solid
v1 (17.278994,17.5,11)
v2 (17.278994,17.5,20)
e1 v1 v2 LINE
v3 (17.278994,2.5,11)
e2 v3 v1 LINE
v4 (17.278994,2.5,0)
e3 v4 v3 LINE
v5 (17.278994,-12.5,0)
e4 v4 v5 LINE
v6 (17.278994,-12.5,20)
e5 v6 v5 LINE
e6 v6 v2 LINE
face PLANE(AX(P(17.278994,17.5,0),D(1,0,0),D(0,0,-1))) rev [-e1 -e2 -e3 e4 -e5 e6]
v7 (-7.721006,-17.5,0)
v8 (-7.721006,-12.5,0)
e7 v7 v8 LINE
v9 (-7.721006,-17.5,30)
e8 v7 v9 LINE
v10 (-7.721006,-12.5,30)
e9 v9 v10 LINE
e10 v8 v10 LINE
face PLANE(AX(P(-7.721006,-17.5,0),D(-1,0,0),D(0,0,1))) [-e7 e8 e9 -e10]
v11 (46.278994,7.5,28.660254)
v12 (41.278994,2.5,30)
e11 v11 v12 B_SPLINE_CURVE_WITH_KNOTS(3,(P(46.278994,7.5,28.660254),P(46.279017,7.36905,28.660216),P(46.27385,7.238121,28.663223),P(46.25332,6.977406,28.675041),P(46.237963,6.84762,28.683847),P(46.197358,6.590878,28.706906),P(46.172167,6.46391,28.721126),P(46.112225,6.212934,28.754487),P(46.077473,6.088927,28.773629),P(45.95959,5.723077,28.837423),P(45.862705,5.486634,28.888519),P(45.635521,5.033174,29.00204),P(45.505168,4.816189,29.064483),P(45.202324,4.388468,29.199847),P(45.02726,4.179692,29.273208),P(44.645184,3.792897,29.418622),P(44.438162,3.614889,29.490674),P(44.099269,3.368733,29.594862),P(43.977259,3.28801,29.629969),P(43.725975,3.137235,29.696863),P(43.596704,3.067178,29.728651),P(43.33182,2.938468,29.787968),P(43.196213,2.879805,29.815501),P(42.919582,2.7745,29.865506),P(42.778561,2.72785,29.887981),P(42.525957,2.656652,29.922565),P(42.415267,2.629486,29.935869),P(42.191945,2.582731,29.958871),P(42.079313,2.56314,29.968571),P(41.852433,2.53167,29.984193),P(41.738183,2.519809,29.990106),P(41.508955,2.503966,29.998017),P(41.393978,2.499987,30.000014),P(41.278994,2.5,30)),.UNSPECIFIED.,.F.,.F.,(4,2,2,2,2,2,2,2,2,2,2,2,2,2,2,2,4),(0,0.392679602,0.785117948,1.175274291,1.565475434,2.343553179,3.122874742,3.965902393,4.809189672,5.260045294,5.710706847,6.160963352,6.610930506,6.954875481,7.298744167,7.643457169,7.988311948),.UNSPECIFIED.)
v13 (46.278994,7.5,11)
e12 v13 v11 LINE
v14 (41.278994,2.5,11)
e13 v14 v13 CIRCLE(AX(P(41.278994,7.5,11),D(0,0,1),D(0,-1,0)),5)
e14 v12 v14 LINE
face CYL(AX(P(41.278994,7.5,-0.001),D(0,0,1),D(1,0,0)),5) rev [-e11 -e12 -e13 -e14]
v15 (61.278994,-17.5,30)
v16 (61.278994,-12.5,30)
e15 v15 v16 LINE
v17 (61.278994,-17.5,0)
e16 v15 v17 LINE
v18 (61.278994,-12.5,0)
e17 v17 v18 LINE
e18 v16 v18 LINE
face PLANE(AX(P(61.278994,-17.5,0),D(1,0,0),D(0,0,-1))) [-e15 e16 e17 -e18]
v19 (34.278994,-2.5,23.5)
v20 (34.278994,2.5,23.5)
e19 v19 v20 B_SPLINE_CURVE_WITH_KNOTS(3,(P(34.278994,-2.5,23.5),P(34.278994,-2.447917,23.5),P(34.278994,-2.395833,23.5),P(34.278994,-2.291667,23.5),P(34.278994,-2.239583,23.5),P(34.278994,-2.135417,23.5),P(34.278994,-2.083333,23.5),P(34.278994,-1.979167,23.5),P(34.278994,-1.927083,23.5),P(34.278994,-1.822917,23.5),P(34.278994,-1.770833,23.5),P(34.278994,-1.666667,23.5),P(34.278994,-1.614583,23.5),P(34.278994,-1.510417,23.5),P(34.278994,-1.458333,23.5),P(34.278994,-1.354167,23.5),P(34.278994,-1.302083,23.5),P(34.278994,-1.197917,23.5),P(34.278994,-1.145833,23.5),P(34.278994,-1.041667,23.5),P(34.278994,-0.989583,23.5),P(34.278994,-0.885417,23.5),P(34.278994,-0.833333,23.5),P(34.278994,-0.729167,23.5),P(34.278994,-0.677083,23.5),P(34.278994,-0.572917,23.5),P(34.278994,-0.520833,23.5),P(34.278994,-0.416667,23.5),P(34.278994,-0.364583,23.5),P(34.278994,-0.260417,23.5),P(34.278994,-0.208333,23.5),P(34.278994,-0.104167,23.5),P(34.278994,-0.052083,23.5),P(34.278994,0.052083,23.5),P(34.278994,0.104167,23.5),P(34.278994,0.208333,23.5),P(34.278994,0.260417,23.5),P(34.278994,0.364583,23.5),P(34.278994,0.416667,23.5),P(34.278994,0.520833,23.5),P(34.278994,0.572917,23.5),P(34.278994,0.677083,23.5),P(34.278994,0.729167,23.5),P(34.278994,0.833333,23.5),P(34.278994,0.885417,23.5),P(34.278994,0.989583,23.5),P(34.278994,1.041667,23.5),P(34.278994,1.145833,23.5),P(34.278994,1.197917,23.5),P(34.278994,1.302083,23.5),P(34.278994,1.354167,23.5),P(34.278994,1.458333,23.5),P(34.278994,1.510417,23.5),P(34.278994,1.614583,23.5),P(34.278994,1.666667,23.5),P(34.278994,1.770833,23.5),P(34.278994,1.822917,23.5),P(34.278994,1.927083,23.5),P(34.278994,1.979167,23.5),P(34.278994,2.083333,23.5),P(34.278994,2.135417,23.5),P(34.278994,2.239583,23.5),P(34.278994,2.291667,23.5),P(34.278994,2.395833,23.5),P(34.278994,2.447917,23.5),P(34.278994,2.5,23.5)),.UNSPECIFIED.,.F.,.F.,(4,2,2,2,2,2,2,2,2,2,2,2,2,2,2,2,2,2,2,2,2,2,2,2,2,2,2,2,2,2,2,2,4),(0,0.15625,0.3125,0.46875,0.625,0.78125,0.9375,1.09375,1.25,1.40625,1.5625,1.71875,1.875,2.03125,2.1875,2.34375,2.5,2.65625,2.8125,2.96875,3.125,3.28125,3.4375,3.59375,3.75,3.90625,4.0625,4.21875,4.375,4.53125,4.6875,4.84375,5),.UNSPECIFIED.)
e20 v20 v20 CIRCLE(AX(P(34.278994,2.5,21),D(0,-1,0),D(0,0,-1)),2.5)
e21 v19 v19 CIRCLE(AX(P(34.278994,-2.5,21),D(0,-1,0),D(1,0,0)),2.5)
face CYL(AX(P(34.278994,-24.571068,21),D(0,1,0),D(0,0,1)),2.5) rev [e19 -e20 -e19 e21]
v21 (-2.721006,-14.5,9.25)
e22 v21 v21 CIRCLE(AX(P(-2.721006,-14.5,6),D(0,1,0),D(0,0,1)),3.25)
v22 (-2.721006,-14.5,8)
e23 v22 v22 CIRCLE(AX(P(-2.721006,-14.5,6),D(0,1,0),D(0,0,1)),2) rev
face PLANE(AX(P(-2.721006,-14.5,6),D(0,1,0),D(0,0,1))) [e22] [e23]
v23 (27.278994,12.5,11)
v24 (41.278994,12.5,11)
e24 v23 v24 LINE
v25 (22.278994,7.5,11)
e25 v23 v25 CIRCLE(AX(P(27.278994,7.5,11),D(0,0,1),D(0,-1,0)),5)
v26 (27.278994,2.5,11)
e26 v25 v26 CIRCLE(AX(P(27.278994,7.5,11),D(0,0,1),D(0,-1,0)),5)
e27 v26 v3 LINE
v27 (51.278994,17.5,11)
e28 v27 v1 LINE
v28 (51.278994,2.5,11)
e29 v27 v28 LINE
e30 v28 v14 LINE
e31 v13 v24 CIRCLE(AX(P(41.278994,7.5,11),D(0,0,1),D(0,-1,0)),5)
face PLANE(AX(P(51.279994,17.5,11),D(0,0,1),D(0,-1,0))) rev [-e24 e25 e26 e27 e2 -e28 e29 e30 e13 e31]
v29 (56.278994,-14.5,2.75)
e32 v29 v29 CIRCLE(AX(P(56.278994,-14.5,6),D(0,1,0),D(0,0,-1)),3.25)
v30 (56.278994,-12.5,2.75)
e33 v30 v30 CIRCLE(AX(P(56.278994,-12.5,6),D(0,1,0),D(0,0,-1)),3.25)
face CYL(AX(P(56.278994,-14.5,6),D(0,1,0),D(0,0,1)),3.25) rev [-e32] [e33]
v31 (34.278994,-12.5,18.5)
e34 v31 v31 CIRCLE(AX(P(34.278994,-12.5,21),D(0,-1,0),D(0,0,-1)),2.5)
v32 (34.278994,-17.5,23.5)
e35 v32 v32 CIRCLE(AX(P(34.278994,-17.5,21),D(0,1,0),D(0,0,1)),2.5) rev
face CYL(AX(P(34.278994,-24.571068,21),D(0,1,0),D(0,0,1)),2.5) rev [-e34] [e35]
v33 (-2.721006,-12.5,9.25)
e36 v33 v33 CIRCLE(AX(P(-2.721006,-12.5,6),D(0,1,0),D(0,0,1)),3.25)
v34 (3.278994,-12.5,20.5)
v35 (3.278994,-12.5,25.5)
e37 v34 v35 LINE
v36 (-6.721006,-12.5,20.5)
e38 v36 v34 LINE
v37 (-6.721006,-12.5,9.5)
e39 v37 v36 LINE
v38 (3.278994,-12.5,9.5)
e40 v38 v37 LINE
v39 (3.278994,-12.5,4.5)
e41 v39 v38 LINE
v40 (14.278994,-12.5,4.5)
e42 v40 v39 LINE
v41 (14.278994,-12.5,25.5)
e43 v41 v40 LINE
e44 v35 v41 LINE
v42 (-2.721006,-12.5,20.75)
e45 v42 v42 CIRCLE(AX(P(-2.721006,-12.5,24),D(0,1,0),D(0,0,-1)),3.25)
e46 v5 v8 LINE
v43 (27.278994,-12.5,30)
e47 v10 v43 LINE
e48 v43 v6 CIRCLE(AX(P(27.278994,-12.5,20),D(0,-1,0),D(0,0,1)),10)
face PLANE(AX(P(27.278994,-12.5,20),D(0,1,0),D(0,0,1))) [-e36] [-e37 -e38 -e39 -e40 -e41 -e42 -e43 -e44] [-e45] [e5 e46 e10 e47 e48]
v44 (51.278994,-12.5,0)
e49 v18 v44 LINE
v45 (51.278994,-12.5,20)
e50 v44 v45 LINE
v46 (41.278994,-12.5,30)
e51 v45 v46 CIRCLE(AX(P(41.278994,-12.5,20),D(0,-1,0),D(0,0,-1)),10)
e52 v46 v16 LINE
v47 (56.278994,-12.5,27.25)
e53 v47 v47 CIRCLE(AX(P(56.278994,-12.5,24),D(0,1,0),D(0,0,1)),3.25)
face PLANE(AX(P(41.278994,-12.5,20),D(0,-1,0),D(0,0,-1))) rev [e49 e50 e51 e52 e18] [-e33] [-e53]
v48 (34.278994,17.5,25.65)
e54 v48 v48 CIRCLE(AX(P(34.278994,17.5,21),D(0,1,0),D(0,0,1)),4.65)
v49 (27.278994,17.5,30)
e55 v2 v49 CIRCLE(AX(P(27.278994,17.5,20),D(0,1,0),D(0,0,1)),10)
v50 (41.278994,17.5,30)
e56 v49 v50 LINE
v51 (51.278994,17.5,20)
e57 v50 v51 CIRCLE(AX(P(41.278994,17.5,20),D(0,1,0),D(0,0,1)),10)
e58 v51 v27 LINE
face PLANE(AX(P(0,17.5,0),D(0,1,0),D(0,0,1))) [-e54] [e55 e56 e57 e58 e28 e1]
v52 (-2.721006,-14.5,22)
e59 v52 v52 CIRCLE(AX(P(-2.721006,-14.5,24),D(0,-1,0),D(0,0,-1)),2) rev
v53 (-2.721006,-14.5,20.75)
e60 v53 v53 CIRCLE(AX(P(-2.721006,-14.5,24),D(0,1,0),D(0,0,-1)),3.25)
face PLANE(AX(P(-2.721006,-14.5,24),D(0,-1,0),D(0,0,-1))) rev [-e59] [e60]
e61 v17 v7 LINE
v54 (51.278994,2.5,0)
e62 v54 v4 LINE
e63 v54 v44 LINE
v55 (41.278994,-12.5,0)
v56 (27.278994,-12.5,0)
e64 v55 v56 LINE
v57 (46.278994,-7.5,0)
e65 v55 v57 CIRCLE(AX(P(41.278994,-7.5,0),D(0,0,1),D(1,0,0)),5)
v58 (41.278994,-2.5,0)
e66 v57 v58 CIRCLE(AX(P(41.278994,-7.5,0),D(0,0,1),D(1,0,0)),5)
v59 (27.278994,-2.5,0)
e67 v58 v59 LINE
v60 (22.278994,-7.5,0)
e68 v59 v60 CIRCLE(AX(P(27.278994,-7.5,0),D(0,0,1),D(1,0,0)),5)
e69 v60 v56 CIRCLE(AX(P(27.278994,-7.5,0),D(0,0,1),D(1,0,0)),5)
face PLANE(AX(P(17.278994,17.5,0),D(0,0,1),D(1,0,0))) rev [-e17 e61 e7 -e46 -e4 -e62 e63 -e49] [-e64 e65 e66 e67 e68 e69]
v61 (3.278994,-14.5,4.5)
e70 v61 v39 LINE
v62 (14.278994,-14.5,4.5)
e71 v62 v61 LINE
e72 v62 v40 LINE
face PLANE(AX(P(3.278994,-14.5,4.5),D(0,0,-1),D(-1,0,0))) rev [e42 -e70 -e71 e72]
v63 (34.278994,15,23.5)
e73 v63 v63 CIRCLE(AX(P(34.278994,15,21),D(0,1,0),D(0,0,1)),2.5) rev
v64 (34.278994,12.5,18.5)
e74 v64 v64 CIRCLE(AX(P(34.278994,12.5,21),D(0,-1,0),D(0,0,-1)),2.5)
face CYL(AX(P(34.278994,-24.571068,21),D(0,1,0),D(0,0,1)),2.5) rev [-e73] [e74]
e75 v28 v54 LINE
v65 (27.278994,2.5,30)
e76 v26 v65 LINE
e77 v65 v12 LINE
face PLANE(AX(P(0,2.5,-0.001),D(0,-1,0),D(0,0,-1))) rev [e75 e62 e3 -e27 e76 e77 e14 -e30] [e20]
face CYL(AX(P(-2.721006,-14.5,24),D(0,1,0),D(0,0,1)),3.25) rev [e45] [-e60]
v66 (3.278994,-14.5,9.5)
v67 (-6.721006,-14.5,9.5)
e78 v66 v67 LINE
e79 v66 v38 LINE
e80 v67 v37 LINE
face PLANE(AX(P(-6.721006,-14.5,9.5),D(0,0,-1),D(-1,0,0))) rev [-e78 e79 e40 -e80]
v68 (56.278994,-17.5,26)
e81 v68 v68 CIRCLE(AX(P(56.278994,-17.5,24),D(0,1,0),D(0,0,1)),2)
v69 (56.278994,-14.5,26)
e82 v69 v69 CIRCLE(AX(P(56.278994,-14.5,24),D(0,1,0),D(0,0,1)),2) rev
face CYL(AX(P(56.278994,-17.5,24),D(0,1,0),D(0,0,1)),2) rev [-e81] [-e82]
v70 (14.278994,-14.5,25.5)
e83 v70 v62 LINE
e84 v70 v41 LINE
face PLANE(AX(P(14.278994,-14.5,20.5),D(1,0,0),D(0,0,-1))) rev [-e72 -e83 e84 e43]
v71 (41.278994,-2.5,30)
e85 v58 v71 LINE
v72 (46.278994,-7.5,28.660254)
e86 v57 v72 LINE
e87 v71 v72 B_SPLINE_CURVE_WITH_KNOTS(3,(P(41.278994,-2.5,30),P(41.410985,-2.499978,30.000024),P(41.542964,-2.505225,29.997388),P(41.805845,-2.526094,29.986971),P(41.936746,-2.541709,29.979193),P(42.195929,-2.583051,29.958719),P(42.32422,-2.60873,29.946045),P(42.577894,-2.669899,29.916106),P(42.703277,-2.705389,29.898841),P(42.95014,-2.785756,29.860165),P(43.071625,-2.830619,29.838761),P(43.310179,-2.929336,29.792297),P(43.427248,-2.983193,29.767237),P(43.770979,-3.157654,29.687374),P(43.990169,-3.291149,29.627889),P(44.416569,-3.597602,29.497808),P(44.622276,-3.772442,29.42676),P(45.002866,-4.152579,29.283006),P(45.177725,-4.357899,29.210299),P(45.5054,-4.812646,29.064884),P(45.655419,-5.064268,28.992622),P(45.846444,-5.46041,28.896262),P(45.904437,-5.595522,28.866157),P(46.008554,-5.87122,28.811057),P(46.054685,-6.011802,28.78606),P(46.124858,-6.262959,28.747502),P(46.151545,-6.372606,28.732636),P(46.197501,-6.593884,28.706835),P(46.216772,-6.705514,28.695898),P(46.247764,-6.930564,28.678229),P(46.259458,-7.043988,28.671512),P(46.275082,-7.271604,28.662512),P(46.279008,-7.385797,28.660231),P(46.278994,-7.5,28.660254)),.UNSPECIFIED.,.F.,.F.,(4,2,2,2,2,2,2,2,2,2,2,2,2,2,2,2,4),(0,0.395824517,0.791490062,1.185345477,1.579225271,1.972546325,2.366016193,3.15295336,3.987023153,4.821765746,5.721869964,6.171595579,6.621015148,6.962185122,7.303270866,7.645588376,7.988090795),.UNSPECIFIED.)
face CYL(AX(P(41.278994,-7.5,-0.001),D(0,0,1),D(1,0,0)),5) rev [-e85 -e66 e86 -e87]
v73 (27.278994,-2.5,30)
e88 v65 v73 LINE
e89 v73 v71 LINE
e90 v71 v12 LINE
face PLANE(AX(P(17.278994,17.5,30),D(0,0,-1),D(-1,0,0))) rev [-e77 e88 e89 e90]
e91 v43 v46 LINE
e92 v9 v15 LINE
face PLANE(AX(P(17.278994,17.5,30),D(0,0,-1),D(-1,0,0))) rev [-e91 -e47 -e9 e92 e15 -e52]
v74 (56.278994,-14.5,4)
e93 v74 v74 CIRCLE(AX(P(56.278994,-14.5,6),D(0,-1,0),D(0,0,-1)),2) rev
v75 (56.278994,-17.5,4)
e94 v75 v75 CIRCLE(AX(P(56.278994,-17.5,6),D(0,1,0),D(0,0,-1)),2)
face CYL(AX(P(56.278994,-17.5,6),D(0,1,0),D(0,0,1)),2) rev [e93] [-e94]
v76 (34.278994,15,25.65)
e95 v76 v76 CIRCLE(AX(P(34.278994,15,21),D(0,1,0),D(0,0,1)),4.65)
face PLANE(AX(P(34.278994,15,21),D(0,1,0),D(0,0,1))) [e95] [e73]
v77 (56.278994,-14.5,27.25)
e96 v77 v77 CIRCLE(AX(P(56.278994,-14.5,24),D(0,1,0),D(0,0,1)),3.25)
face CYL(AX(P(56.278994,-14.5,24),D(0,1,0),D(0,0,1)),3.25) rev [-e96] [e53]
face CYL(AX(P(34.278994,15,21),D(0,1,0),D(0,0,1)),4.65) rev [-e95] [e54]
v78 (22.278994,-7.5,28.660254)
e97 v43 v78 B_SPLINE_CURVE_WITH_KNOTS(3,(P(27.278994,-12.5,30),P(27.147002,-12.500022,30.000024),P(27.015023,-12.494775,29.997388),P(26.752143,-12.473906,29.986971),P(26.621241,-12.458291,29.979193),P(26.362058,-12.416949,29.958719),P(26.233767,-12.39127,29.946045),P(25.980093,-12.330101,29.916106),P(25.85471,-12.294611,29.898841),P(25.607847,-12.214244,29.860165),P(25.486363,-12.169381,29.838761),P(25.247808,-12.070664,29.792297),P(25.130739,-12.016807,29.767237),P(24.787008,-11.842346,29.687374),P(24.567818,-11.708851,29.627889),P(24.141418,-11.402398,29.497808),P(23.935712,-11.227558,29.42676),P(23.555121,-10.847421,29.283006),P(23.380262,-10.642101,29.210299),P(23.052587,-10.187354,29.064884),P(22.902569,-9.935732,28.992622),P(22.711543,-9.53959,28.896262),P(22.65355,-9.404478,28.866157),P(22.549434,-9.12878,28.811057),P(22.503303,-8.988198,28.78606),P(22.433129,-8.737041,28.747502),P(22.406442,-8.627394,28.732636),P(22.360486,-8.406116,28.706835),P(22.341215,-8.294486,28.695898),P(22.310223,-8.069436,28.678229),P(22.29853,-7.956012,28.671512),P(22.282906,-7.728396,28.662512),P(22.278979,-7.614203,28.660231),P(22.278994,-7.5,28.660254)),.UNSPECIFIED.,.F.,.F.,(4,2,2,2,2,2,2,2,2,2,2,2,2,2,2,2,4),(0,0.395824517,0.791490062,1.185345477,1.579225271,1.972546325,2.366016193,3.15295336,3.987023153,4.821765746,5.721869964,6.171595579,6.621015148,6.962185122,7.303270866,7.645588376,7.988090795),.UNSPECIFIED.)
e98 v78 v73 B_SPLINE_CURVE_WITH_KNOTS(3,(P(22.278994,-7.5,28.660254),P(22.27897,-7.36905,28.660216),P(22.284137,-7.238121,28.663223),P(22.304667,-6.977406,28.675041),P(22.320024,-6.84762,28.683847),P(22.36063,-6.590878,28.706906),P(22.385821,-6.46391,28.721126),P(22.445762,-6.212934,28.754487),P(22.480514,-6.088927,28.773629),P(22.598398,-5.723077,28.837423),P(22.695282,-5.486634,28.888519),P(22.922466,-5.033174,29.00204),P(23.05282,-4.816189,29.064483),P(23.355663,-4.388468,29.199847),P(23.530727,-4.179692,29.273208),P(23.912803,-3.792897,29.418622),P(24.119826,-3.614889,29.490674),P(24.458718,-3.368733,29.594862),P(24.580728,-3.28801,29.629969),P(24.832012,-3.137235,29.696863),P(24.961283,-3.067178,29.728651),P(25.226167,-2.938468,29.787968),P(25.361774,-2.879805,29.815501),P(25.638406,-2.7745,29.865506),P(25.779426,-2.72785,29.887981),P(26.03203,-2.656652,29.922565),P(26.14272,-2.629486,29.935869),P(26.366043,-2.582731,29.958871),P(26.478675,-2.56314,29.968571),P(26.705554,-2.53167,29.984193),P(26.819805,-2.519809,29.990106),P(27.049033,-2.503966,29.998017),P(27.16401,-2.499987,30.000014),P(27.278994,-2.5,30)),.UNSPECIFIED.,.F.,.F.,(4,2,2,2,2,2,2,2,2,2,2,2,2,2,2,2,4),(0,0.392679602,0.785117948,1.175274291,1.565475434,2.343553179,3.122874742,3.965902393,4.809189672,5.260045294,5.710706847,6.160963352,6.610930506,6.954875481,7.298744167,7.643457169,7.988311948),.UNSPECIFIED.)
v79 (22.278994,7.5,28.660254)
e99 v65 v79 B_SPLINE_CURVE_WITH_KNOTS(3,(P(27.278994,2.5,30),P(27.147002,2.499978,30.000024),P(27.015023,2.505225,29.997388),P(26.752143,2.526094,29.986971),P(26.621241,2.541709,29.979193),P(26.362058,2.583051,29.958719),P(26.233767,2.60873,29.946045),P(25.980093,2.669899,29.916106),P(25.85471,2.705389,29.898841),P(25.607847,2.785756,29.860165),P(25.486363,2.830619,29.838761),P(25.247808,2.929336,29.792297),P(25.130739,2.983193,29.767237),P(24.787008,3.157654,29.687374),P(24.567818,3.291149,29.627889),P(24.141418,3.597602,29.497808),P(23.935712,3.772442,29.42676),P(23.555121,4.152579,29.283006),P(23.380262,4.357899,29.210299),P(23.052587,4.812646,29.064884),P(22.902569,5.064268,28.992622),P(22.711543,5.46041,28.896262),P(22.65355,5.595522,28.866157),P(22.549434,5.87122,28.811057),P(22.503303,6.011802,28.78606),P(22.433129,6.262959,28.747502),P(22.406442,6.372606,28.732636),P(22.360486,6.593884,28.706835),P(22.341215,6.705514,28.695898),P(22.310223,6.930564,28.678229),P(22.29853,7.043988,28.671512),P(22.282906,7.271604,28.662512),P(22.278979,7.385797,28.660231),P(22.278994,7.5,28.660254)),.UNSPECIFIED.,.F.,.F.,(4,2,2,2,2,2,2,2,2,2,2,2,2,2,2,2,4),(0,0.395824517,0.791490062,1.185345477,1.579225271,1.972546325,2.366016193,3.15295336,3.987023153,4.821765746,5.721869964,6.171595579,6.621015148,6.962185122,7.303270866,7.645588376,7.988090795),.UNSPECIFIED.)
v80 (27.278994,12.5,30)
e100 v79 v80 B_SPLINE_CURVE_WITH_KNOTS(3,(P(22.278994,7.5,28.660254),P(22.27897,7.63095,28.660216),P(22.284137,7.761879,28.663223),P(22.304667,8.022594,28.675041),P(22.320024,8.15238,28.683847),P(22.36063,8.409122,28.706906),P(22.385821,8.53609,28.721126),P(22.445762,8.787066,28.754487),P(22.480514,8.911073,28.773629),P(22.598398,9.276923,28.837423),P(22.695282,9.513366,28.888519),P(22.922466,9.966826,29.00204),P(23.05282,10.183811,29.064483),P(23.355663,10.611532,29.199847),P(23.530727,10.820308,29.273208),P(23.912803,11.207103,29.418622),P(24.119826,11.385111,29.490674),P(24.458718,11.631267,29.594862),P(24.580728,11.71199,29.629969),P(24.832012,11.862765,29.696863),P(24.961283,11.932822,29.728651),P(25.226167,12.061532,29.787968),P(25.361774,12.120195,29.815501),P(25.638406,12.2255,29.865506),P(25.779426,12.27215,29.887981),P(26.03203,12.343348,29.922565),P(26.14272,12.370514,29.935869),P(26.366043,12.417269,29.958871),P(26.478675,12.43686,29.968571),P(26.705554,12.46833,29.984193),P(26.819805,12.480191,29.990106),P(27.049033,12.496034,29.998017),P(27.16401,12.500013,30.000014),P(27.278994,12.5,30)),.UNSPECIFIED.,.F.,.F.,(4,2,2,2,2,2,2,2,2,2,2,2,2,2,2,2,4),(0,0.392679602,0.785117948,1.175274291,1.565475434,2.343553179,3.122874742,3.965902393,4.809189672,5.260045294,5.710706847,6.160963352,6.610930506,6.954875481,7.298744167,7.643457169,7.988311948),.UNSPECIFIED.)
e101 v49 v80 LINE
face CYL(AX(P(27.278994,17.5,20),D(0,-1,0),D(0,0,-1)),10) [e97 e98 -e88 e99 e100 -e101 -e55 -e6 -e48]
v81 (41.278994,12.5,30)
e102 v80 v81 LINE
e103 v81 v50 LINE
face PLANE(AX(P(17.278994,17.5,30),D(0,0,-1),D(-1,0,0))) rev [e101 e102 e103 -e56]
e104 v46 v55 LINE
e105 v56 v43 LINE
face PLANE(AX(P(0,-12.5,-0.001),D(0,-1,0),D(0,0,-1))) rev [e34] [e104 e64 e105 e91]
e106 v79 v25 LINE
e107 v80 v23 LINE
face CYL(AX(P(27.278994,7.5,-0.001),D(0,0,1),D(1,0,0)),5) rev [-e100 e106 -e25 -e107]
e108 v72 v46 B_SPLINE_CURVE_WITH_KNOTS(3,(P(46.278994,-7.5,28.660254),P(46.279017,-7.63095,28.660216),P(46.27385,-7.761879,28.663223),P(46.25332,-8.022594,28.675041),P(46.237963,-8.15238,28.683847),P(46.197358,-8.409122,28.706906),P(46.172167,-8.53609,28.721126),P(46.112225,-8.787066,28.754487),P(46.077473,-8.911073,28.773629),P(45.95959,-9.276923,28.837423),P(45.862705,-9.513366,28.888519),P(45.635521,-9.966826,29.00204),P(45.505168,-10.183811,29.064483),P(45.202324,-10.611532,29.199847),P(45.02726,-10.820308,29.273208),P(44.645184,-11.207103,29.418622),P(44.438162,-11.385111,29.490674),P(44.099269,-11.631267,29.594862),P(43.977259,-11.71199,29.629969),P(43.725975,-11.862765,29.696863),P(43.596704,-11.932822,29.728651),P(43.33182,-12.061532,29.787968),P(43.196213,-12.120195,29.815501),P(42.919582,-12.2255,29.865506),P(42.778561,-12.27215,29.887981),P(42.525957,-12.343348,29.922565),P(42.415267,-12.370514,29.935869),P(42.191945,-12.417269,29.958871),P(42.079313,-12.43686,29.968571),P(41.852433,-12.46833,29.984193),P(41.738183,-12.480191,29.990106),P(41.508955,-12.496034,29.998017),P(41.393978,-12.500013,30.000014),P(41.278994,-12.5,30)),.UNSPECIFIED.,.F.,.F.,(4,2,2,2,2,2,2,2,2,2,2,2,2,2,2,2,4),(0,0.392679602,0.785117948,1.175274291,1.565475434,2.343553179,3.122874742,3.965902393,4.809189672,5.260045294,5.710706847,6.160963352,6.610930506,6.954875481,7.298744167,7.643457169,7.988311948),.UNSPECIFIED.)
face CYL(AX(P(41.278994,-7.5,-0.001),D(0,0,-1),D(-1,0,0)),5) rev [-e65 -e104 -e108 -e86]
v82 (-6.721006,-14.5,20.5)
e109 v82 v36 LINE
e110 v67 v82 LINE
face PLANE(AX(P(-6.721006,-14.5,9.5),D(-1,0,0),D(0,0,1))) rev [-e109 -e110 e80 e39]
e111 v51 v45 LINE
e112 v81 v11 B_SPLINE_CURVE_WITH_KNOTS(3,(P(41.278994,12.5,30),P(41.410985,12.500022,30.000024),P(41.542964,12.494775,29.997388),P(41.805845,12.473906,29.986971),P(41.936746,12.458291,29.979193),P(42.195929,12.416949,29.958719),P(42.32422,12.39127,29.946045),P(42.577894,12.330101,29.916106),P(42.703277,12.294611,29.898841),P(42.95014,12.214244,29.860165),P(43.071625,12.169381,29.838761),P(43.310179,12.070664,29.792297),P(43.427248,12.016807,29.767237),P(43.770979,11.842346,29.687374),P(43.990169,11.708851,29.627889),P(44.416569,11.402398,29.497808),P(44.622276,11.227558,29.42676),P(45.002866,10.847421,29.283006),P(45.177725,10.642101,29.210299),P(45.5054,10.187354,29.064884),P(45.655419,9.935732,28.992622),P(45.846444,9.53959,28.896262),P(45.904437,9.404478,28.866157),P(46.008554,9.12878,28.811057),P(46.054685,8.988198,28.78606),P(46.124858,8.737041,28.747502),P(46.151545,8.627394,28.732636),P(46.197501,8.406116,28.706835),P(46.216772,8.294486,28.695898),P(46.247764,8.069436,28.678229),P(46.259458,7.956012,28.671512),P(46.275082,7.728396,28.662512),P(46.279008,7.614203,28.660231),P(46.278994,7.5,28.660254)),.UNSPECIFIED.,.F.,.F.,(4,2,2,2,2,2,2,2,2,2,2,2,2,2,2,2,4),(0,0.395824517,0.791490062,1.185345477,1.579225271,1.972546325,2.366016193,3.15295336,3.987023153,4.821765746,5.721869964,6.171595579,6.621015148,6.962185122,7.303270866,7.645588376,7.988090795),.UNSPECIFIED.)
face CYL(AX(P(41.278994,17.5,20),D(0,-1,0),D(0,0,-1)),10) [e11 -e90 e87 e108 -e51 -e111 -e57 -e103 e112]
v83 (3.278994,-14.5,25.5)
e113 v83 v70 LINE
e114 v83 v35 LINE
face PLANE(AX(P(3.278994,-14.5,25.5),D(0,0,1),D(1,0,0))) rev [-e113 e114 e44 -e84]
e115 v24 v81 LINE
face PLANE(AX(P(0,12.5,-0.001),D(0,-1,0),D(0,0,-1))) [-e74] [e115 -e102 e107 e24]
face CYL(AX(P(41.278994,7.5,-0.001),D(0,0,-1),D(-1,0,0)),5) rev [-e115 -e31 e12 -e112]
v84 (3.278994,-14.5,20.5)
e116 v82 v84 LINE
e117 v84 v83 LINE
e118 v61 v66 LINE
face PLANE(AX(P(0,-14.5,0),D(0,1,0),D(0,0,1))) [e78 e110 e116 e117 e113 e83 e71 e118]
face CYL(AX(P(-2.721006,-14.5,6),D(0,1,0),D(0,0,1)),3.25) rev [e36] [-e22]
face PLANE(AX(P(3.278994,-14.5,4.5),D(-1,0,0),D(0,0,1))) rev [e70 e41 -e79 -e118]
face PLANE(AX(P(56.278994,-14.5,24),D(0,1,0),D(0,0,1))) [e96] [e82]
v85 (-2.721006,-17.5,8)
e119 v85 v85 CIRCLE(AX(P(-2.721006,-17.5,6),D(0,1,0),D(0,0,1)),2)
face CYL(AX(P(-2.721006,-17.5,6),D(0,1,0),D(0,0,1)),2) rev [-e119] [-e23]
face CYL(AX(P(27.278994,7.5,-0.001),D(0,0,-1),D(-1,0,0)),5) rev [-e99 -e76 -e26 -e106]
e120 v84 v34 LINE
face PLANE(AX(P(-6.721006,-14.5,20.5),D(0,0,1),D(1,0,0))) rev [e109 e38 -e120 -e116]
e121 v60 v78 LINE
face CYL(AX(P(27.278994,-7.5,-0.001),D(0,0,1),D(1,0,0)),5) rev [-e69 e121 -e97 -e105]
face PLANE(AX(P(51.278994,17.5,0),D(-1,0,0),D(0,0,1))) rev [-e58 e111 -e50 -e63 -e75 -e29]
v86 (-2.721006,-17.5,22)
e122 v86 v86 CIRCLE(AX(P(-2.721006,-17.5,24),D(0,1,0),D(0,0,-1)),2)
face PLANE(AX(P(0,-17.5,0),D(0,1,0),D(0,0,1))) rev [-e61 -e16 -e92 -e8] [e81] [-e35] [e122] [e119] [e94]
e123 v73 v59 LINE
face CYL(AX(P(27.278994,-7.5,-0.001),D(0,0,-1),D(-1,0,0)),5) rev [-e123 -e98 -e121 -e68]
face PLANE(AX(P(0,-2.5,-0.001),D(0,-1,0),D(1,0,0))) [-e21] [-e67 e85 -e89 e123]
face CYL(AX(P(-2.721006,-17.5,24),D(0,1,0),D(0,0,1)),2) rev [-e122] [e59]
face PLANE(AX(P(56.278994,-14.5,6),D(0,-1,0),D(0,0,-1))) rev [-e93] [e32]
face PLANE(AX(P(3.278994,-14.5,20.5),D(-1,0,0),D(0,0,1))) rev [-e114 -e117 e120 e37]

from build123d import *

# Parameters (mm, degrees)
CROQUIS21_W             = 34
CROQUIS21_H             = 30
SALIENTE_EXTRUIR4_DEPTH = 17.5
CORTAR_EXTRUIR17_REACH  = 63.934
CROQUIS22_W             = 24
CROQUIS22_H             = 10
CORTAR_EXTRUIR18_REACH  = 50.603
CROQUIS23_W             = 11
CROQUIS23_H             = 15
CORTAR_EXTRUIR19_REACH  = 70.953
CROQUIS24_R             = 2.5
CROQUIS25_R             = 4.65
CORTAR_EXTRUIR20_DEPTH  = 2.5
REDONDEO2_R             = 10
REDONDEO3_R             = 5
CROQUIS27_R             = 2
SALIENTE_EXTRUIR5_DEPTH = 5
CROQUIS30_R             = 3.25
CORTAR_EXTRUIR21_DEPTH  = 2


# Some blends are built 0.0001 mm under size
with BuildPart() as part:
    # Croquis21 → Saliente-Extruir4 (new, symmetric)
    with BuildSketch(Plane(origin=(0, 0, 0), x_dir=(1, 0, 0), z_dir=(0, 1, 0))):
        with Locations((34.278993672, -15)):
            Rectangle(CROQUIS21_W, CROQUIS21_H)
    extrude(amount=SALIENTE_EXTRUIR4_DEPTH, both=True)

    # Croquis22 → Cortar-Extruir17 (cut, up to next)
    with BuildSketch(Plane.XY.offset(30), mode=Mode.PRIVATE) as cortar_extruir17_sk1:
        with Locations((34.278993672, 7.5)):
            Rectangle(CROQUIS22_W, CROQUIS22_H)
    cortar_extruir17_tool1 = extrude(cortar_extruir17_sk1.sketch, amount=-CORTAR_EXTRUIR17_REACH, mode=Mode.PRIVATE) & part.part
    # Croquis22 → Cortar-Extruir17 (cut, up to next)
    with BuildSketch(Plane.XY.offset(30), mode=Mode.PRIVATE) as cortar_extruir17_sk2:
        with Locations((34.278993672, -7.5)):
            Rectangle(CROQUIS22_W, CROQUIS22_H)
    cortar_extruir17_tool2 = extrude(cortar_extruir17_sk2.sketch, amount=-CORTAR_EXTRUIR17_REACH, mode=Mode.PRIVATE) & part.part
    add(cortar_extruir17_tool1.solids().sort_by_distance((34.278994, 7.5, 30))[0], mode=Mode.SUBTRACT)
    add(cortar_extruir17_tool2.solids().sort_by_distance((34.278994, -7.5, 30))[0], mode=Mode.SUBTRACT)

    # Croquis23 → Cortar-Extruir18 (cut, up to next)
    with BuildSketch(Plane.ZY.offset(-17.278993672), mode=Mode.PRIVATE) as cortar_extruir18_sk1:
        with Locations((5.5, 10)):
            Rectangle(CROQUIS23_W, CROQUIS23_H)
    cortar_extruir18_tool1 = extrude(cortar_extruir18_sk1.sketch, amount=-CORTAR_EXTRUIR18_REACH, mode=Mode.PRIVATE) & part.part
    add(cortar_extruir18_tool1.solids().sort_by_distance((17.278994, 10, 5.5))[0], mode=Mode.SUBTRACT)

    # Cortar-Extruir19: up to this face of the body (flat: up to its plane)
    cortar_extruir19_end = Plane(part.part.faces().sort_by_distance((34.278993672, -17.5, 15))[0])
    # Croquis24 → Cortar-Extruir19 (cut, up to the picked face)
    with BuildSketch(Plane(origin=(0, 17.5, 0), x_dir=(1, 0, 0), z_dir=(0, 1, 0)), mode=Mode.PRIVATE) as cortar_extruir19_sk1:
        with Locations(Location((34.278993672, -21, 0), (0, 0, 270))):
            Circle(CROQUIS24_R)
    cortar_extruir19_tool1 = split(extrude(cortar_extruir19_sk1.sketch, amount=-CORTAR_EXTRUIR19_REACH, mode=Mode.PRIVATE), bisect_by=cortar_extruir19_end, keep=Keep.BOTH, mode=Mode.PRIVATE)
    add(cortar_extruir19_tool1.solids().sort_by(Axis((34.278994, 17.5, 21), (0, -1, 0)))[0], mode=Mode.SUBTRACT)

    # Croquis25 → Cortar-Extruir20 (cut)
    with BuildSketch(Plane(origin=(0, 17.5, 0), x_dir=(1, 0, 0), z_dir=(0, 1, 0))):
        with Locations(Location((34.278993672, -21, 0), (0, 0, 270))):
            Circle(CROQUIS25_R)
    extrude(amount=-CORTAR_EXTRUIR20_DEPTH, mode=Mode.SUBTRACT)

    # Redondeo2
    # the kernel refuses this fillet: 10 mm, written as the material it takes off along each edge
    with BuildSketch(Plane(origin=(51.278993672, 42.5, 30), x_dir=(0, 0, -1), z_dir=(0, -1, 0)), Plane(origin=(17.278993672, -42.5, 30), x_dir=(0, 0, -1), z_dir=(0, 1, 0))) as redondeo2_piece_1:
        with BuildLine():
            CenterArc((REDONDEO2_R, -REDONDEO2_R), REDONDEO2_R, 90, 90)
            Line((0, -REDONDEO2_R), (0, 0))
            Line((0, 0), (REDONDEO2_R, 0))
        make_face()
    extrude(amount=85, mode=Mode.SUBTRACT)

    # Redondeo3
    redondeo3_edges = [part.edges().sort_by_distance(p)[0] for p in [
        (46.278993672, 12.5, 19.830127019),
        (46.278993672, 2.5, 19.830127019),
        (46.278993672, -12.5, 14.330127019),
        (22.278993672, -12.5, 14.330127019),
        (22.278993672, -2.5, 14.330127019),
        (22.278993672, 12.5, 19.830127019),
        (22.278993672, 2.5, 19.830127019),
        (46.278993672, -2.5, 14.330127019),
    ]]
    fillet(redondeo3_edges, radius=REDONDEO3_R - 0.0001)  # a hair under: the kernel refuses the full size

    # Croquis27 → Saliente-Extruir5 (add)
    # profile 1 of 2: a face of its own
    with BuildSketch(Plane(origin=(0, -12.5, 0), x_dir=(1, 0, 0), z_dir=(0, 1, 0))):
        with BuildLine():
            Line((27.278993672, -30), (17.278993672, -30))
            Line((17.278993672, -30), (-7.721006328, -30))
            Line((-7.721006328, -30), (-7.721006328, 0))
            Line((-7.721006328, 0), (17.278993672, 0))
            Line((17.278993672, 0), (17.278993672, -20))
            ThreePointArc((17.278993672, -20), (20.20792586, -27.071067812), (27.278993672, -30))
        make_face()
        with Locations(Location((-2.721006328, -6, 0), (0, 0, 270))):
            Circle(CROQUIS27_R, mode=Mode.SUBTRACT)
        with Locations(Location((-2.721006328, -24, 0), (0, 0, 90))):
            Circle(CROQUIS27_R, mode=Mode.SUBTRACT)
    # profile 2 of 2: a face of its own
    with BuildSketch(Plane(origin=(0, -12.5, 0), x_dir=(1, 0, 0), z_dir=(0, 1, 0))):
        with BuildLine():
            Line((51.278993672, 0), (51.278993672, -20))
            ThreePointArc((51.278993672, -20), (48.350061484, -27.071067812), (41.278993672, -30))
            Line((41.278993672, -30), (61.278993672, -30))
            Line((61.278993672, -30), (61.278993672, 0))
            Line((61.278993672, 0), (51.278993672, 0))
        make_face()
        with Locations(Location((56.278993672, -6, 0), (0, 0, 90))):
            Circle(CROQUIS27_R, mode=Mode.SUBTRACT)
        with Locations(Location((56.278993672, -24, 0), (0, 0, 270))):
            Circle(CROQUIS27_R, mode=Mode.SUBTRACT)
    extrude(amount=-SALIENTE_EXTRUIR5_DEPTH)

    # Croquis30 → Cortar-Extruir21 (cut)
    with BuildSketch(Plane(origin=(0, -12.5, 0), x_dir=(1, 0, 0), z_dir=(0, 1, 0))):
        with Locations(Location((-2.721006328, -6, 0), (0, 0, 270))):
            Circle(CROQUIS30_R)
        with Locations(Location((-2.721006328, -24, 0), (0, 0, 90))):
            Circle(CROQUIS30_R)
        with Locations(Location((56.278993672, -6, 0), (0, 0, 90))):
            Circle(CROQUIS30_R)
        with Locations(Location((56.278993672, -24, 0), (0, 0, 270))):
            Circle(CROQUIS30_R)
        Polygon((3.278993672, -4.5), (14.278993672, -4.5), (14.278993672, -9.5), (14.278993672, -20.5), (14.278993672, -25.5), (3.278993672, -25.5), (3.278993672, -20.5), (-6.721006328, -20.5), (-6.721006328, -9.5), (3.278993672, -9.5), align=None)
    extrude(amount=-CORTAR_EXTRUIR21_DEPTH, mode=Mode.SUBTRACT)


solid = part.part
